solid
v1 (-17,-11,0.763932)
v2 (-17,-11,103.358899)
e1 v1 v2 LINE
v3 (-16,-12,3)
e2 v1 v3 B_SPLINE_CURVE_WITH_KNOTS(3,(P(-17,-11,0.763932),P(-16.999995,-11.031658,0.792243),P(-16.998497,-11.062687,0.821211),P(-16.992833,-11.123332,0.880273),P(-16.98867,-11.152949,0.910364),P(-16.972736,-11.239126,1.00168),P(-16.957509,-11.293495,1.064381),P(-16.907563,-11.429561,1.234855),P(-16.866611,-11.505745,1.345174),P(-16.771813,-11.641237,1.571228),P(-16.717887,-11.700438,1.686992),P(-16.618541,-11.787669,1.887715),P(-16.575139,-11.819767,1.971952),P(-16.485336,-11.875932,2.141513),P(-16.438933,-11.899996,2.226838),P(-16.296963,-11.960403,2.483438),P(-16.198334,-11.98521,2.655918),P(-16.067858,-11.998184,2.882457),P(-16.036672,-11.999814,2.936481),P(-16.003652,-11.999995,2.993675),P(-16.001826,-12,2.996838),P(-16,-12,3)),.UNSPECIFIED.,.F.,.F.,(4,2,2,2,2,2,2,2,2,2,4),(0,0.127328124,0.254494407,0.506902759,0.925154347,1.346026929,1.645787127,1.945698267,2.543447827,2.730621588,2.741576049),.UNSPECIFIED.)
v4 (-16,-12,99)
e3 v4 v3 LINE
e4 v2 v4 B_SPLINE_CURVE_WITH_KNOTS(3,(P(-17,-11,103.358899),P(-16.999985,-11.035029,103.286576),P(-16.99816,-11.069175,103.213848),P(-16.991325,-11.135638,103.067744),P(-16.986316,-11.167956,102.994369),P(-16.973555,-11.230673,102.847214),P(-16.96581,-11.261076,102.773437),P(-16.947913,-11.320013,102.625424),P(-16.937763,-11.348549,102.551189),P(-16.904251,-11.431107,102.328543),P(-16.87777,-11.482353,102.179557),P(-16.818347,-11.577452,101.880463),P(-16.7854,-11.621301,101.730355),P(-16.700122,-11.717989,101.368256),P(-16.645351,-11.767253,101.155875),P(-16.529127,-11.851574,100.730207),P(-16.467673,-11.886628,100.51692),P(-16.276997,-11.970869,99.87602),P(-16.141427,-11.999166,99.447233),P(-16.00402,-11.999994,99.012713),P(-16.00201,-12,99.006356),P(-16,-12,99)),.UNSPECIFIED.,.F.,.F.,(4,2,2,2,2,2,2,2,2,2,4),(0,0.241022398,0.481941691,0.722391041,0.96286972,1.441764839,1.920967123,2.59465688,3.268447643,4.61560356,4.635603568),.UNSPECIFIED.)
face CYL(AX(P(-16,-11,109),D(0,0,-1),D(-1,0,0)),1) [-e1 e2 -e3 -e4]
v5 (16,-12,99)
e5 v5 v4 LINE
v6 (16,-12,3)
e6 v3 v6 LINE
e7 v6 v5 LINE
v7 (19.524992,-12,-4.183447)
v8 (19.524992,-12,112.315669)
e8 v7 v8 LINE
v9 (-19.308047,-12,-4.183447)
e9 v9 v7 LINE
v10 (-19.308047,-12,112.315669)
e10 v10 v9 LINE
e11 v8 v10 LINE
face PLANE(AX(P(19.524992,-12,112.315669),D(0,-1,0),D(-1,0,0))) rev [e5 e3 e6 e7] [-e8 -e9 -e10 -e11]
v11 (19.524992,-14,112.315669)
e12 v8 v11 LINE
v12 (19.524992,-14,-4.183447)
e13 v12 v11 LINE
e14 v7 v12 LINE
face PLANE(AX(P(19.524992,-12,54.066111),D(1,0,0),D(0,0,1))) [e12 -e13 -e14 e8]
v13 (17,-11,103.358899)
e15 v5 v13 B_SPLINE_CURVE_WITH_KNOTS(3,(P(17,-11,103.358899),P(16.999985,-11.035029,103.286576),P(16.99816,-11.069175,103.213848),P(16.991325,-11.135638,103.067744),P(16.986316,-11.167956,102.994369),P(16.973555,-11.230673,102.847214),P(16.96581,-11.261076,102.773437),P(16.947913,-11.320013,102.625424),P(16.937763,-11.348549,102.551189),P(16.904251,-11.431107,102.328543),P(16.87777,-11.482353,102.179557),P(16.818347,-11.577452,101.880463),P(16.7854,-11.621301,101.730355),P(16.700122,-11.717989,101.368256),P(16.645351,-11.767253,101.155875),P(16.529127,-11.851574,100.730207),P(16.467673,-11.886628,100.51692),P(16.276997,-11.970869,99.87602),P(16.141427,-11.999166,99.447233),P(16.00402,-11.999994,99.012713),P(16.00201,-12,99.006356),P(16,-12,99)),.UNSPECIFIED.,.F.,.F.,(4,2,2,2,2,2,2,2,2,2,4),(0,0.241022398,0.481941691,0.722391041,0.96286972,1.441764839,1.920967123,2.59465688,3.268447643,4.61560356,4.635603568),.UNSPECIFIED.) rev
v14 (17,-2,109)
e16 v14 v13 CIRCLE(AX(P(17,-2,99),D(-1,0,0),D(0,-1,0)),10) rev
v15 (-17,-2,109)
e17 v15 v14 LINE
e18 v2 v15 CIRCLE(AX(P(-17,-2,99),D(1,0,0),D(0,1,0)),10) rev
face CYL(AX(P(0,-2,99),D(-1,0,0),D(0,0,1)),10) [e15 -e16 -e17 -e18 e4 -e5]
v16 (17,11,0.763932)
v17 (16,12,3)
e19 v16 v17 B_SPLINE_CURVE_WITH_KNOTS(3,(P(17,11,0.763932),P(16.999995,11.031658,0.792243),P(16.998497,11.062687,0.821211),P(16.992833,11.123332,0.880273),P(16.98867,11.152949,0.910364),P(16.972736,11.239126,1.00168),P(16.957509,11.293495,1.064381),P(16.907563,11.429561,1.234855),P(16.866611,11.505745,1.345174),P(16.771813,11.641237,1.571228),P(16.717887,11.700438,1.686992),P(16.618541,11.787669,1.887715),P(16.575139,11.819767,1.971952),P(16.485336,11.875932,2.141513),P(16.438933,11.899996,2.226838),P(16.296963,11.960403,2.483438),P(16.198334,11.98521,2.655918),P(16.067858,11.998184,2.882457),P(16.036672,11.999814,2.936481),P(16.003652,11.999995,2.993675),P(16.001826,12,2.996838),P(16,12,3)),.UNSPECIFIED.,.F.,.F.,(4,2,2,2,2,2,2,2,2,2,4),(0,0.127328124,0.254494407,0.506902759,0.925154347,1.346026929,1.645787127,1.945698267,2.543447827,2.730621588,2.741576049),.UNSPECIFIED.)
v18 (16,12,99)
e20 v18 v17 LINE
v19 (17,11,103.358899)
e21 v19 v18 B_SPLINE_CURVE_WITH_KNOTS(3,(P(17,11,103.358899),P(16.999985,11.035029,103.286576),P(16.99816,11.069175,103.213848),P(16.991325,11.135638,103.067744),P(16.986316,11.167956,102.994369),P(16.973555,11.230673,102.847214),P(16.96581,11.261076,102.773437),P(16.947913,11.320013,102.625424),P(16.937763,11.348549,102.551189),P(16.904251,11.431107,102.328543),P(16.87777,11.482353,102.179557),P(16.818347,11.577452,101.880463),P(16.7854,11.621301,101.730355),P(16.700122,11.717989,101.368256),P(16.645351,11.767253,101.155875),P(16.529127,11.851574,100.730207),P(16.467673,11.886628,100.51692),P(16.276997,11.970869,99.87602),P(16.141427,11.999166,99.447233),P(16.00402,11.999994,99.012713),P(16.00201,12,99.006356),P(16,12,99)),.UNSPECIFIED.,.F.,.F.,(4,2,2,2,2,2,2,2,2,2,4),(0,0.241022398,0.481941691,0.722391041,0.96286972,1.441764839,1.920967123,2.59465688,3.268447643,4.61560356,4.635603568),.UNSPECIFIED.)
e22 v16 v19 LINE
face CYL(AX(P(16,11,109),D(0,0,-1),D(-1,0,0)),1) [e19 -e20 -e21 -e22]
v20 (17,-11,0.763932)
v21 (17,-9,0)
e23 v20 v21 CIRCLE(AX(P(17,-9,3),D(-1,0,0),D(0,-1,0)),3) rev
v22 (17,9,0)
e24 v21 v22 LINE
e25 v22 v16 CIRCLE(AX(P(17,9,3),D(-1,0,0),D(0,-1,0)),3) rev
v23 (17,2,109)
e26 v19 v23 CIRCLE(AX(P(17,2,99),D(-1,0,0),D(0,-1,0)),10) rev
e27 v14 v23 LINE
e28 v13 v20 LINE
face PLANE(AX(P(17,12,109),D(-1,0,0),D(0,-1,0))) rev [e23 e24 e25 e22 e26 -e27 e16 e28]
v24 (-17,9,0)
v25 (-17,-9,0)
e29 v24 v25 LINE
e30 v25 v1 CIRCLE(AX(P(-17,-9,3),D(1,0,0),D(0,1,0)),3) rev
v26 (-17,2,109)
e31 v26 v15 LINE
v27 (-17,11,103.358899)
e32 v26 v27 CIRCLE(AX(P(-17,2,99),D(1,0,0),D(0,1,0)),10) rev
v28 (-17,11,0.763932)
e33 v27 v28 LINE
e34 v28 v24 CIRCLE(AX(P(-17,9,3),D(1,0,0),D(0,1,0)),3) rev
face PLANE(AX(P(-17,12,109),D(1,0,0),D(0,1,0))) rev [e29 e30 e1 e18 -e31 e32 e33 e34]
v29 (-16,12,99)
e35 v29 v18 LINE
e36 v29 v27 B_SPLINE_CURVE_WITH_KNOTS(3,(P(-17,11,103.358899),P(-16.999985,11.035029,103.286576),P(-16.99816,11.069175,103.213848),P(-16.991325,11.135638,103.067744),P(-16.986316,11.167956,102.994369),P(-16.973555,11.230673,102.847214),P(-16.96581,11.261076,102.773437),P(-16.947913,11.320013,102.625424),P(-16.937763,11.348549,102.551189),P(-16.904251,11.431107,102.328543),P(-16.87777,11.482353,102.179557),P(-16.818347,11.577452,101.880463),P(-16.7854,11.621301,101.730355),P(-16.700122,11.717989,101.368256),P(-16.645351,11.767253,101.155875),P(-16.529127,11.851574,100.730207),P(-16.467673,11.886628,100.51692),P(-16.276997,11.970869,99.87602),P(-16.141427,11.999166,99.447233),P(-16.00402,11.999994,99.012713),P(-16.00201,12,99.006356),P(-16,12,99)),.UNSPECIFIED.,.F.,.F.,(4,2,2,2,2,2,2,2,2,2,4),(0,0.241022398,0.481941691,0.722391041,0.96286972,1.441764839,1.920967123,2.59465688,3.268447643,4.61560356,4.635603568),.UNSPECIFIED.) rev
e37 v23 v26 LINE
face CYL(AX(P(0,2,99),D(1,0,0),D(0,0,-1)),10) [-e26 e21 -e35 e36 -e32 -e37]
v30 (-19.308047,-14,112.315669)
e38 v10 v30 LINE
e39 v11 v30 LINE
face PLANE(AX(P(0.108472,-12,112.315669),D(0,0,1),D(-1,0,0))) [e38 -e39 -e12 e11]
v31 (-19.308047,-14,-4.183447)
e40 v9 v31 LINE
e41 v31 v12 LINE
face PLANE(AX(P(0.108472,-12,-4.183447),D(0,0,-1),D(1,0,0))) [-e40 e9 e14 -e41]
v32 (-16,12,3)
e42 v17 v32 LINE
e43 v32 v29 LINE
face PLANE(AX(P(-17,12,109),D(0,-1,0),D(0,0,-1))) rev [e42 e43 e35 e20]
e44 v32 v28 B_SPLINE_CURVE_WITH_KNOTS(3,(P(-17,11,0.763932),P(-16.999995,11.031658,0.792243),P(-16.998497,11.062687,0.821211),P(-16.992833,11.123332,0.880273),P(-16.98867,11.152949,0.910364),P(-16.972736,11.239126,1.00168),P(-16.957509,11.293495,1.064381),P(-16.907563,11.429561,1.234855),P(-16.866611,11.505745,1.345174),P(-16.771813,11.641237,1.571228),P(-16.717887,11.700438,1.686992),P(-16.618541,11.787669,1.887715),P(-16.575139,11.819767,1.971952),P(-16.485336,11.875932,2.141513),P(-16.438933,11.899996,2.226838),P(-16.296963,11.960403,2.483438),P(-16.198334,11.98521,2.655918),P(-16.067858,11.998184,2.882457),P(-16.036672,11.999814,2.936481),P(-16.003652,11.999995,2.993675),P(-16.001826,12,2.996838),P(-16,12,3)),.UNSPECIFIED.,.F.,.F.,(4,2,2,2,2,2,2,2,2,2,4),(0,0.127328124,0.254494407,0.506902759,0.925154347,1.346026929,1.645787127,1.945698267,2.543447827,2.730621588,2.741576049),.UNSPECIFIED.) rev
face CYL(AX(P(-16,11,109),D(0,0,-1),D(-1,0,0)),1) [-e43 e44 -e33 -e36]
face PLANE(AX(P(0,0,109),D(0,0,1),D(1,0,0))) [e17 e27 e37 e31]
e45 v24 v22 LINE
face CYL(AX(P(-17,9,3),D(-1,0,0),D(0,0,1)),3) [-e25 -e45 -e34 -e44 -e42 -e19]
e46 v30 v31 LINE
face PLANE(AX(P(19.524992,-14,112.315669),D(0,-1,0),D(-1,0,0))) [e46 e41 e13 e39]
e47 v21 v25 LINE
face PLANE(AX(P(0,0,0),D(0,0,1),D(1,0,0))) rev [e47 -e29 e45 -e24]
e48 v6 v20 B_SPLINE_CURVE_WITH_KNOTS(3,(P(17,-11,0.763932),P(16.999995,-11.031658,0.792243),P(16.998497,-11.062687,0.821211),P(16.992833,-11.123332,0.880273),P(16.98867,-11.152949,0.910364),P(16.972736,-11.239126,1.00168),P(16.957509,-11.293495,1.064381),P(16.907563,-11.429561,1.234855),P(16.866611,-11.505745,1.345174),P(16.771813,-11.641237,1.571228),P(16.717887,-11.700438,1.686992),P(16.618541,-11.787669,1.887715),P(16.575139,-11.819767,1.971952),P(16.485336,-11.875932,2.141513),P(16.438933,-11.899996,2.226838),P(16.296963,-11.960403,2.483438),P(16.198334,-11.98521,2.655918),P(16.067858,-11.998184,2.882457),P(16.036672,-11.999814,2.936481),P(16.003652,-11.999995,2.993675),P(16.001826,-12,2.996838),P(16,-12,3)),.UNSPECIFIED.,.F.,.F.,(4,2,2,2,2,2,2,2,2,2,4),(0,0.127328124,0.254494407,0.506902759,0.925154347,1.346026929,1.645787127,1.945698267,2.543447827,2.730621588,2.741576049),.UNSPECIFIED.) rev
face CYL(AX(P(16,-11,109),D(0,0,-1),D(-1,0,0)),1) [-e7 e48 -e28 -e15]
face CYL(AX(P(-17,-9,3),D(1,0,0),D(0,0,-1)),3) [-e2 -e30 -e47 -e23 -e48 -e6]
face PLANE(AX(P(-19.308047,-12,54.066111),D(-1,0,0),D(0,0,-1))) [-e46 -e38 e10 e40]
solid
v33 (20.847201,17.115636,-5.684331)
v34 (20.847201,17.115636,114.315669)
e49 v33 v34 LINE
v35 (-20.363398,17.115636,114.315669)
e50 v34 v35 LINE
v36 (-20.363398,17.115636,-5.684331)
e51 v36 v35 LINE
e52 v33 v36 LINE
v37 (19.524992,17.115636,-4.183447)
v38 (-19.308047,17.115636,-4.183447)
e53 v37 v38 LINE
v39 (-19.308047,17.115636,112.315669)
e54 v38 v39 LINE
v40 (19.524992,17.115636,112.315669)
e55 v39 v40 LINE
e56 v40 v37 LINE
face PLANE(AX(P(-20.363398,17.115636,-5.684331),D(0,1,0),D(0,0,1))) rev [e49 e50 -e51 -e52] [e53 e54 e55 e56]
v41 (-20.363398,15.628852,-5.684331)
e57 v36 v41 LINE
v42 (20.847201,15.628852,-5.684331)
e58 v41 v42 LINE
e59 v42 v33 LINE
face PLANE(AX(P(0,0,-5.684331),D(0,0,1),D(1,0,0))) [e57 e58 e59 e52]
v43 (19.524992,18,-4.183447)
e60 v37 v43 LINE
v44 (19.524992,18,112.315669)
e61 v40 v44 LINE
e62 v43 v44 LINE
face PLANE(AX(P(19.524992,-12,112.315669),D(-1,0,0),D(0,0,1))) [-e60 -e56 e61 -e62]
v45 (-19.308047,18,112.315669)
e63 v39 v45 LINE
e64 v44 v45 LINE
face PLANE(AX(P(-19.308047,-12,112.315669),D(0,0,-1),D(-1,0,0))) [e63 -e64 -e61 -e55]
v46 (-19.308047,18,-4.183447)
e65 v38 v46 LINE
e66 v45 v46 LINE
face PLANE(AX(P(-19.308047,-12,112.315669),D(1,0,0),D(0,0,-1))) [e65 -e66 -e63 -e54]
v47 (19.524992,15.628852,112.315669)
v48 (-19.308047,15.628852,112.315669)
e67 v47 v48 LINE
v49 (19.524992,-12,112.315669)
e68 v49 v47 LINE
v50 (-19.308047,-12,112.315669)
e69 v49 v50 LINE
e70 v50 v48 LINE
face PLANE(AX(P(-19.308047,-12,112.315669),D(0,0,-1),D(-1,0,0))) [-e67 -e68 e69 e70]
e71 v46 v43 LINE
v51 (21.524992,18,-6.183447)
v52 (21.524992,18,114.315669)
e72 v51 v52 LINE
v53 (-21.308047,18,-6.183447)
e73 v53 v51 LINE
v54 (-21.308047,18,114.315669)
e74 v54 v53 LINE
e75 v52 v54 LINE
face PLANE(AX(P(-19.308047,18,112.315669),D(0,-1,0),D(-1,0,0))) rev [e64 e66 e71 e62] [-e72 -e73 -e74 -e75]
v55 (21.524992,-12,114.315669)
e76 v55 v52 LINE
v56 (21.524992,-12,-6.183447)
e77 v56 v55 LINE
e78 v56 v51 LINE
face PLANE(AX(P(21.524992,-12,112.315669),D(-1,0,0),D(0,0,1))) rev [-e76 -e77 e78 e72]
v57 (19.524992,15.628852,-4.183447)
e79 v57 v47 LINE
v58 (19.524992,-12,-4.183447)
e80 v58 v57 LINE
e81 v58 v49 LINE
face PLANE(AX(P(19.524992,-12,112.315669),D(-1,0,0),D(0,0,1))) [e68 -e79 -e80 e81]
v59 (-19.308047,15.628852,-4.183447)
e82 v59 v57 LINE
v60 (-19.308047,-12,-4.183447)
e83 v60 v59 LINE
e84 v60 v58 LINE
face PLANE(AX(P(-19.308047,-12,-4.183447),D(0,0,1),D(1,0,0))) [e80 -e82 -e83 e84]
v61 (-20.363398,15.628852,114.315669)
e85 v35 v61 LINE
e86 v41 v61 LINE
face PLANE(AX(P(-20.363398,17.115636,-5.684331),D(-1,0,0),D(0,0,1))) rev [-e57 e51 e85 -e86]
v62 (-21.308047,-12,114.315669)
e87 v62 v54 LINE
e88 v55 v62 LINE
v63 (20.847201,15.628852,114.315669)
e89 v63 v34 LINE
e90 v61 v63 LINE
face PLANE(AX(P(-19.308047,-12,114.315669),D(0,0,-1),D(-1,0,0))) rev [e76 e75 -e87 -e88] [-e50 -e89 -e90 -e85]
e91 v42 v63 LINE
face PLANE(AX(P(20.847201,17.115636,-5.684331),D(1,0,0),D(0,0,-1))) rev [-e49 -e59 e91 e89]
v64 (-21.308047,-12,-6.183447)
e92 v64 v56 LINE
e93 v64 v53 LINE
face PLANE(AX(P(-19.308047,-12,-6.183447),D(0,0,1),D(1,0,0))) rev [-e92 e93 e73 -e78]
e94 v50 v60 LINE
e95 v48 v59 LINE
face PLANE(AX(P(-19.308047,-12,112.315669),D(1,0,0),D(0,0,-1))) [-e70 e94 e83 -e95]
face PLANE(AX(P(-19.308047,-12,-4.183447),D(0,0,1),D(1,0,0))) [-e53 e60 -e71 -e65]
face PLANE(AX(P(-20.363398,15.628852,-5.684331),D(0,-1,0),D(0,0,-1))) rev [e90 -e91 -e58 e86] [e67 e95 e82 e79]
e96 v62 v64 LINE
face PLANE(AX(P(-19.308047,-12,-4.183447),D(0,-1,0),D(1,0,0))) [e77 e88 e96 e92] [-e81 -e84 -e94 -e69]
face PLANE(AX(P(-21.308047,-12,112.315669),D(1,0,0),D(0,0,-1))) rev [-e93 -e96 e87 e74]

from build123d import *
from OCP.BRepFilletAPI import BRepFilletAPI_MakeFillet

# Parameters (mm, degrees)
SKETCH1_W                  = 34
SKETCH1_H                  = 24
BOSS_EXTRUDE1_DEPTH        = 109
FILLET1_R1                 = 3
FILLET1_R2                 = 1
FILLET1_R3                 = 10
SURFACE_EXTRUSION1_1_BACK  = 30
SURFACE_EXTRUSION1_1_DEPTH = 30
EPAISSIR1_T1               = 2
EPAISSIR2_START            = -4.183446705
EPAISSIR2_OUTLINE_W        = 38.83303867
EPAISSIR2_OUTLINE_H        = 2
EPAISSIR2_DEPTH            = 116.499116009
ESQUISSE3_W                = 41.210599086
ESQUISSE3_H                = 1.486783871
ENL_V_MAT_EXTRU_1_DEPTH    = 120


# Read off the part's stored shape, not the designer's step: Epaissir2
with BuildPart() as part:
    # Sketch1 → Boss-Extrude1 (new body)
    with BuildSketch(Plane.XY):
        Rectangle(SKETCH1_W, SKETCH1_H)
    extrude(amount=BOSS_EXTRUDE1_DEPTH)

    # Fillet1: one fillet with a radius per group of edges: ONE call of the kernel's fillet builder (fillet() takes one radius for all edges)
    fillet1_edges_1 = [part.edges().sort_by_distance(p)[0] for p in [
        (0, 12, 0),
        (0, -12, 0),
    ]]
    fillet1_edges_2 = [part.edges().sort_by_distance(p)[0] for p in [
        (17, 12, 54.5),
        (-17, 12, 54.5),
        (17, -12, 54.5),
        (-17, -12, 54.5),
    ]]
    fillet1_edges_3 = [part.edges().sort_by_distance(p)[0] for p in [
        (0, 12, 109),
        (0, -12, 109),
    ]]
    fillet1 = BRepFilletAPI_MakeFillet(part.part.solid().wrapped)
    for e in fillet1_edges_1:
        fillet1.Add(FILLET1_R1, e.wrapped)
    for e in fillet1_edges_2:
        fillet1.Add(FILLET1_R2, e.wrapped)
    for e in fillet1_edges_3:
        fillet1.Add(FILLET1_R3, e.wrapped)
    add(Compound.cast(fillet1.Shape()), mode=Mode.REPLACE)



with BuildPart() as body_2:
    # Surface-Extrusion1: a surface, the sketch's curves swept straight by 30 mm
    with BuildLine(Plane.XZ.offset(12).offset(-SURFACE_EXTRUSION1_1_BACK), mode=Mode.PRIVATE) as surface_extrusion1_1_path:
        Line((-19.30804716, 112.315669304), (19.52499151, 112.315669304))
        Line((19.52499151, 112.315669304), (19.52499151, -4.183446705))
        Line((19.52499151, -4.183446705), (-19.30804716, -4.183446705))
        Line((-19.30804716, -4.183446705), (-19.30804716, 112.315669304))
    surface_extrusion1_1 = Shell.extrude(surface_extrusion1_1_path.wire(), (0 * SURFACE_EXTRUSION1_1_DEPTH, -1 * SURFACE_EXTRUSION1_1_DEPTH, 0 * SURFACE_EXTRUSION1_1_DEPTH))
    add(Solid.thicken(surface_extrusion1_1, EPAISSIR1_T1))


with BuildPart() as part_1:
    add(part.part)

    add(body_2.part)  # Epaissir2 merges body 2
    # Epaissir2 outline → Epaissir2 (add)
    with BuildSketch(Plane.XY.offset(EPAISSIR2_START)):
        with Locations((0.108472175, -13)):
            Rectangle(EPAISSIR2_OUTLINE_W, EPAISSIR2_OUTLINE_H)
    extrude(amount=EPAISSIR2_DEPTH)

    # Esquisse3 → Enlèv. mat.-Extru.1 (cut)
    with BuildSketch(Plane.XY.offset(114.315669304)):
        with Locations((0.241901497, 16.372244085)):
            Rectangle(ESQUISSE3_W, ESQUISSE3_H)
    extrude(amount=-ENL_V_MAT_EXTRU_1_DEPTH, mode=Mode.SUBTRACT)


solid = part_1.part
